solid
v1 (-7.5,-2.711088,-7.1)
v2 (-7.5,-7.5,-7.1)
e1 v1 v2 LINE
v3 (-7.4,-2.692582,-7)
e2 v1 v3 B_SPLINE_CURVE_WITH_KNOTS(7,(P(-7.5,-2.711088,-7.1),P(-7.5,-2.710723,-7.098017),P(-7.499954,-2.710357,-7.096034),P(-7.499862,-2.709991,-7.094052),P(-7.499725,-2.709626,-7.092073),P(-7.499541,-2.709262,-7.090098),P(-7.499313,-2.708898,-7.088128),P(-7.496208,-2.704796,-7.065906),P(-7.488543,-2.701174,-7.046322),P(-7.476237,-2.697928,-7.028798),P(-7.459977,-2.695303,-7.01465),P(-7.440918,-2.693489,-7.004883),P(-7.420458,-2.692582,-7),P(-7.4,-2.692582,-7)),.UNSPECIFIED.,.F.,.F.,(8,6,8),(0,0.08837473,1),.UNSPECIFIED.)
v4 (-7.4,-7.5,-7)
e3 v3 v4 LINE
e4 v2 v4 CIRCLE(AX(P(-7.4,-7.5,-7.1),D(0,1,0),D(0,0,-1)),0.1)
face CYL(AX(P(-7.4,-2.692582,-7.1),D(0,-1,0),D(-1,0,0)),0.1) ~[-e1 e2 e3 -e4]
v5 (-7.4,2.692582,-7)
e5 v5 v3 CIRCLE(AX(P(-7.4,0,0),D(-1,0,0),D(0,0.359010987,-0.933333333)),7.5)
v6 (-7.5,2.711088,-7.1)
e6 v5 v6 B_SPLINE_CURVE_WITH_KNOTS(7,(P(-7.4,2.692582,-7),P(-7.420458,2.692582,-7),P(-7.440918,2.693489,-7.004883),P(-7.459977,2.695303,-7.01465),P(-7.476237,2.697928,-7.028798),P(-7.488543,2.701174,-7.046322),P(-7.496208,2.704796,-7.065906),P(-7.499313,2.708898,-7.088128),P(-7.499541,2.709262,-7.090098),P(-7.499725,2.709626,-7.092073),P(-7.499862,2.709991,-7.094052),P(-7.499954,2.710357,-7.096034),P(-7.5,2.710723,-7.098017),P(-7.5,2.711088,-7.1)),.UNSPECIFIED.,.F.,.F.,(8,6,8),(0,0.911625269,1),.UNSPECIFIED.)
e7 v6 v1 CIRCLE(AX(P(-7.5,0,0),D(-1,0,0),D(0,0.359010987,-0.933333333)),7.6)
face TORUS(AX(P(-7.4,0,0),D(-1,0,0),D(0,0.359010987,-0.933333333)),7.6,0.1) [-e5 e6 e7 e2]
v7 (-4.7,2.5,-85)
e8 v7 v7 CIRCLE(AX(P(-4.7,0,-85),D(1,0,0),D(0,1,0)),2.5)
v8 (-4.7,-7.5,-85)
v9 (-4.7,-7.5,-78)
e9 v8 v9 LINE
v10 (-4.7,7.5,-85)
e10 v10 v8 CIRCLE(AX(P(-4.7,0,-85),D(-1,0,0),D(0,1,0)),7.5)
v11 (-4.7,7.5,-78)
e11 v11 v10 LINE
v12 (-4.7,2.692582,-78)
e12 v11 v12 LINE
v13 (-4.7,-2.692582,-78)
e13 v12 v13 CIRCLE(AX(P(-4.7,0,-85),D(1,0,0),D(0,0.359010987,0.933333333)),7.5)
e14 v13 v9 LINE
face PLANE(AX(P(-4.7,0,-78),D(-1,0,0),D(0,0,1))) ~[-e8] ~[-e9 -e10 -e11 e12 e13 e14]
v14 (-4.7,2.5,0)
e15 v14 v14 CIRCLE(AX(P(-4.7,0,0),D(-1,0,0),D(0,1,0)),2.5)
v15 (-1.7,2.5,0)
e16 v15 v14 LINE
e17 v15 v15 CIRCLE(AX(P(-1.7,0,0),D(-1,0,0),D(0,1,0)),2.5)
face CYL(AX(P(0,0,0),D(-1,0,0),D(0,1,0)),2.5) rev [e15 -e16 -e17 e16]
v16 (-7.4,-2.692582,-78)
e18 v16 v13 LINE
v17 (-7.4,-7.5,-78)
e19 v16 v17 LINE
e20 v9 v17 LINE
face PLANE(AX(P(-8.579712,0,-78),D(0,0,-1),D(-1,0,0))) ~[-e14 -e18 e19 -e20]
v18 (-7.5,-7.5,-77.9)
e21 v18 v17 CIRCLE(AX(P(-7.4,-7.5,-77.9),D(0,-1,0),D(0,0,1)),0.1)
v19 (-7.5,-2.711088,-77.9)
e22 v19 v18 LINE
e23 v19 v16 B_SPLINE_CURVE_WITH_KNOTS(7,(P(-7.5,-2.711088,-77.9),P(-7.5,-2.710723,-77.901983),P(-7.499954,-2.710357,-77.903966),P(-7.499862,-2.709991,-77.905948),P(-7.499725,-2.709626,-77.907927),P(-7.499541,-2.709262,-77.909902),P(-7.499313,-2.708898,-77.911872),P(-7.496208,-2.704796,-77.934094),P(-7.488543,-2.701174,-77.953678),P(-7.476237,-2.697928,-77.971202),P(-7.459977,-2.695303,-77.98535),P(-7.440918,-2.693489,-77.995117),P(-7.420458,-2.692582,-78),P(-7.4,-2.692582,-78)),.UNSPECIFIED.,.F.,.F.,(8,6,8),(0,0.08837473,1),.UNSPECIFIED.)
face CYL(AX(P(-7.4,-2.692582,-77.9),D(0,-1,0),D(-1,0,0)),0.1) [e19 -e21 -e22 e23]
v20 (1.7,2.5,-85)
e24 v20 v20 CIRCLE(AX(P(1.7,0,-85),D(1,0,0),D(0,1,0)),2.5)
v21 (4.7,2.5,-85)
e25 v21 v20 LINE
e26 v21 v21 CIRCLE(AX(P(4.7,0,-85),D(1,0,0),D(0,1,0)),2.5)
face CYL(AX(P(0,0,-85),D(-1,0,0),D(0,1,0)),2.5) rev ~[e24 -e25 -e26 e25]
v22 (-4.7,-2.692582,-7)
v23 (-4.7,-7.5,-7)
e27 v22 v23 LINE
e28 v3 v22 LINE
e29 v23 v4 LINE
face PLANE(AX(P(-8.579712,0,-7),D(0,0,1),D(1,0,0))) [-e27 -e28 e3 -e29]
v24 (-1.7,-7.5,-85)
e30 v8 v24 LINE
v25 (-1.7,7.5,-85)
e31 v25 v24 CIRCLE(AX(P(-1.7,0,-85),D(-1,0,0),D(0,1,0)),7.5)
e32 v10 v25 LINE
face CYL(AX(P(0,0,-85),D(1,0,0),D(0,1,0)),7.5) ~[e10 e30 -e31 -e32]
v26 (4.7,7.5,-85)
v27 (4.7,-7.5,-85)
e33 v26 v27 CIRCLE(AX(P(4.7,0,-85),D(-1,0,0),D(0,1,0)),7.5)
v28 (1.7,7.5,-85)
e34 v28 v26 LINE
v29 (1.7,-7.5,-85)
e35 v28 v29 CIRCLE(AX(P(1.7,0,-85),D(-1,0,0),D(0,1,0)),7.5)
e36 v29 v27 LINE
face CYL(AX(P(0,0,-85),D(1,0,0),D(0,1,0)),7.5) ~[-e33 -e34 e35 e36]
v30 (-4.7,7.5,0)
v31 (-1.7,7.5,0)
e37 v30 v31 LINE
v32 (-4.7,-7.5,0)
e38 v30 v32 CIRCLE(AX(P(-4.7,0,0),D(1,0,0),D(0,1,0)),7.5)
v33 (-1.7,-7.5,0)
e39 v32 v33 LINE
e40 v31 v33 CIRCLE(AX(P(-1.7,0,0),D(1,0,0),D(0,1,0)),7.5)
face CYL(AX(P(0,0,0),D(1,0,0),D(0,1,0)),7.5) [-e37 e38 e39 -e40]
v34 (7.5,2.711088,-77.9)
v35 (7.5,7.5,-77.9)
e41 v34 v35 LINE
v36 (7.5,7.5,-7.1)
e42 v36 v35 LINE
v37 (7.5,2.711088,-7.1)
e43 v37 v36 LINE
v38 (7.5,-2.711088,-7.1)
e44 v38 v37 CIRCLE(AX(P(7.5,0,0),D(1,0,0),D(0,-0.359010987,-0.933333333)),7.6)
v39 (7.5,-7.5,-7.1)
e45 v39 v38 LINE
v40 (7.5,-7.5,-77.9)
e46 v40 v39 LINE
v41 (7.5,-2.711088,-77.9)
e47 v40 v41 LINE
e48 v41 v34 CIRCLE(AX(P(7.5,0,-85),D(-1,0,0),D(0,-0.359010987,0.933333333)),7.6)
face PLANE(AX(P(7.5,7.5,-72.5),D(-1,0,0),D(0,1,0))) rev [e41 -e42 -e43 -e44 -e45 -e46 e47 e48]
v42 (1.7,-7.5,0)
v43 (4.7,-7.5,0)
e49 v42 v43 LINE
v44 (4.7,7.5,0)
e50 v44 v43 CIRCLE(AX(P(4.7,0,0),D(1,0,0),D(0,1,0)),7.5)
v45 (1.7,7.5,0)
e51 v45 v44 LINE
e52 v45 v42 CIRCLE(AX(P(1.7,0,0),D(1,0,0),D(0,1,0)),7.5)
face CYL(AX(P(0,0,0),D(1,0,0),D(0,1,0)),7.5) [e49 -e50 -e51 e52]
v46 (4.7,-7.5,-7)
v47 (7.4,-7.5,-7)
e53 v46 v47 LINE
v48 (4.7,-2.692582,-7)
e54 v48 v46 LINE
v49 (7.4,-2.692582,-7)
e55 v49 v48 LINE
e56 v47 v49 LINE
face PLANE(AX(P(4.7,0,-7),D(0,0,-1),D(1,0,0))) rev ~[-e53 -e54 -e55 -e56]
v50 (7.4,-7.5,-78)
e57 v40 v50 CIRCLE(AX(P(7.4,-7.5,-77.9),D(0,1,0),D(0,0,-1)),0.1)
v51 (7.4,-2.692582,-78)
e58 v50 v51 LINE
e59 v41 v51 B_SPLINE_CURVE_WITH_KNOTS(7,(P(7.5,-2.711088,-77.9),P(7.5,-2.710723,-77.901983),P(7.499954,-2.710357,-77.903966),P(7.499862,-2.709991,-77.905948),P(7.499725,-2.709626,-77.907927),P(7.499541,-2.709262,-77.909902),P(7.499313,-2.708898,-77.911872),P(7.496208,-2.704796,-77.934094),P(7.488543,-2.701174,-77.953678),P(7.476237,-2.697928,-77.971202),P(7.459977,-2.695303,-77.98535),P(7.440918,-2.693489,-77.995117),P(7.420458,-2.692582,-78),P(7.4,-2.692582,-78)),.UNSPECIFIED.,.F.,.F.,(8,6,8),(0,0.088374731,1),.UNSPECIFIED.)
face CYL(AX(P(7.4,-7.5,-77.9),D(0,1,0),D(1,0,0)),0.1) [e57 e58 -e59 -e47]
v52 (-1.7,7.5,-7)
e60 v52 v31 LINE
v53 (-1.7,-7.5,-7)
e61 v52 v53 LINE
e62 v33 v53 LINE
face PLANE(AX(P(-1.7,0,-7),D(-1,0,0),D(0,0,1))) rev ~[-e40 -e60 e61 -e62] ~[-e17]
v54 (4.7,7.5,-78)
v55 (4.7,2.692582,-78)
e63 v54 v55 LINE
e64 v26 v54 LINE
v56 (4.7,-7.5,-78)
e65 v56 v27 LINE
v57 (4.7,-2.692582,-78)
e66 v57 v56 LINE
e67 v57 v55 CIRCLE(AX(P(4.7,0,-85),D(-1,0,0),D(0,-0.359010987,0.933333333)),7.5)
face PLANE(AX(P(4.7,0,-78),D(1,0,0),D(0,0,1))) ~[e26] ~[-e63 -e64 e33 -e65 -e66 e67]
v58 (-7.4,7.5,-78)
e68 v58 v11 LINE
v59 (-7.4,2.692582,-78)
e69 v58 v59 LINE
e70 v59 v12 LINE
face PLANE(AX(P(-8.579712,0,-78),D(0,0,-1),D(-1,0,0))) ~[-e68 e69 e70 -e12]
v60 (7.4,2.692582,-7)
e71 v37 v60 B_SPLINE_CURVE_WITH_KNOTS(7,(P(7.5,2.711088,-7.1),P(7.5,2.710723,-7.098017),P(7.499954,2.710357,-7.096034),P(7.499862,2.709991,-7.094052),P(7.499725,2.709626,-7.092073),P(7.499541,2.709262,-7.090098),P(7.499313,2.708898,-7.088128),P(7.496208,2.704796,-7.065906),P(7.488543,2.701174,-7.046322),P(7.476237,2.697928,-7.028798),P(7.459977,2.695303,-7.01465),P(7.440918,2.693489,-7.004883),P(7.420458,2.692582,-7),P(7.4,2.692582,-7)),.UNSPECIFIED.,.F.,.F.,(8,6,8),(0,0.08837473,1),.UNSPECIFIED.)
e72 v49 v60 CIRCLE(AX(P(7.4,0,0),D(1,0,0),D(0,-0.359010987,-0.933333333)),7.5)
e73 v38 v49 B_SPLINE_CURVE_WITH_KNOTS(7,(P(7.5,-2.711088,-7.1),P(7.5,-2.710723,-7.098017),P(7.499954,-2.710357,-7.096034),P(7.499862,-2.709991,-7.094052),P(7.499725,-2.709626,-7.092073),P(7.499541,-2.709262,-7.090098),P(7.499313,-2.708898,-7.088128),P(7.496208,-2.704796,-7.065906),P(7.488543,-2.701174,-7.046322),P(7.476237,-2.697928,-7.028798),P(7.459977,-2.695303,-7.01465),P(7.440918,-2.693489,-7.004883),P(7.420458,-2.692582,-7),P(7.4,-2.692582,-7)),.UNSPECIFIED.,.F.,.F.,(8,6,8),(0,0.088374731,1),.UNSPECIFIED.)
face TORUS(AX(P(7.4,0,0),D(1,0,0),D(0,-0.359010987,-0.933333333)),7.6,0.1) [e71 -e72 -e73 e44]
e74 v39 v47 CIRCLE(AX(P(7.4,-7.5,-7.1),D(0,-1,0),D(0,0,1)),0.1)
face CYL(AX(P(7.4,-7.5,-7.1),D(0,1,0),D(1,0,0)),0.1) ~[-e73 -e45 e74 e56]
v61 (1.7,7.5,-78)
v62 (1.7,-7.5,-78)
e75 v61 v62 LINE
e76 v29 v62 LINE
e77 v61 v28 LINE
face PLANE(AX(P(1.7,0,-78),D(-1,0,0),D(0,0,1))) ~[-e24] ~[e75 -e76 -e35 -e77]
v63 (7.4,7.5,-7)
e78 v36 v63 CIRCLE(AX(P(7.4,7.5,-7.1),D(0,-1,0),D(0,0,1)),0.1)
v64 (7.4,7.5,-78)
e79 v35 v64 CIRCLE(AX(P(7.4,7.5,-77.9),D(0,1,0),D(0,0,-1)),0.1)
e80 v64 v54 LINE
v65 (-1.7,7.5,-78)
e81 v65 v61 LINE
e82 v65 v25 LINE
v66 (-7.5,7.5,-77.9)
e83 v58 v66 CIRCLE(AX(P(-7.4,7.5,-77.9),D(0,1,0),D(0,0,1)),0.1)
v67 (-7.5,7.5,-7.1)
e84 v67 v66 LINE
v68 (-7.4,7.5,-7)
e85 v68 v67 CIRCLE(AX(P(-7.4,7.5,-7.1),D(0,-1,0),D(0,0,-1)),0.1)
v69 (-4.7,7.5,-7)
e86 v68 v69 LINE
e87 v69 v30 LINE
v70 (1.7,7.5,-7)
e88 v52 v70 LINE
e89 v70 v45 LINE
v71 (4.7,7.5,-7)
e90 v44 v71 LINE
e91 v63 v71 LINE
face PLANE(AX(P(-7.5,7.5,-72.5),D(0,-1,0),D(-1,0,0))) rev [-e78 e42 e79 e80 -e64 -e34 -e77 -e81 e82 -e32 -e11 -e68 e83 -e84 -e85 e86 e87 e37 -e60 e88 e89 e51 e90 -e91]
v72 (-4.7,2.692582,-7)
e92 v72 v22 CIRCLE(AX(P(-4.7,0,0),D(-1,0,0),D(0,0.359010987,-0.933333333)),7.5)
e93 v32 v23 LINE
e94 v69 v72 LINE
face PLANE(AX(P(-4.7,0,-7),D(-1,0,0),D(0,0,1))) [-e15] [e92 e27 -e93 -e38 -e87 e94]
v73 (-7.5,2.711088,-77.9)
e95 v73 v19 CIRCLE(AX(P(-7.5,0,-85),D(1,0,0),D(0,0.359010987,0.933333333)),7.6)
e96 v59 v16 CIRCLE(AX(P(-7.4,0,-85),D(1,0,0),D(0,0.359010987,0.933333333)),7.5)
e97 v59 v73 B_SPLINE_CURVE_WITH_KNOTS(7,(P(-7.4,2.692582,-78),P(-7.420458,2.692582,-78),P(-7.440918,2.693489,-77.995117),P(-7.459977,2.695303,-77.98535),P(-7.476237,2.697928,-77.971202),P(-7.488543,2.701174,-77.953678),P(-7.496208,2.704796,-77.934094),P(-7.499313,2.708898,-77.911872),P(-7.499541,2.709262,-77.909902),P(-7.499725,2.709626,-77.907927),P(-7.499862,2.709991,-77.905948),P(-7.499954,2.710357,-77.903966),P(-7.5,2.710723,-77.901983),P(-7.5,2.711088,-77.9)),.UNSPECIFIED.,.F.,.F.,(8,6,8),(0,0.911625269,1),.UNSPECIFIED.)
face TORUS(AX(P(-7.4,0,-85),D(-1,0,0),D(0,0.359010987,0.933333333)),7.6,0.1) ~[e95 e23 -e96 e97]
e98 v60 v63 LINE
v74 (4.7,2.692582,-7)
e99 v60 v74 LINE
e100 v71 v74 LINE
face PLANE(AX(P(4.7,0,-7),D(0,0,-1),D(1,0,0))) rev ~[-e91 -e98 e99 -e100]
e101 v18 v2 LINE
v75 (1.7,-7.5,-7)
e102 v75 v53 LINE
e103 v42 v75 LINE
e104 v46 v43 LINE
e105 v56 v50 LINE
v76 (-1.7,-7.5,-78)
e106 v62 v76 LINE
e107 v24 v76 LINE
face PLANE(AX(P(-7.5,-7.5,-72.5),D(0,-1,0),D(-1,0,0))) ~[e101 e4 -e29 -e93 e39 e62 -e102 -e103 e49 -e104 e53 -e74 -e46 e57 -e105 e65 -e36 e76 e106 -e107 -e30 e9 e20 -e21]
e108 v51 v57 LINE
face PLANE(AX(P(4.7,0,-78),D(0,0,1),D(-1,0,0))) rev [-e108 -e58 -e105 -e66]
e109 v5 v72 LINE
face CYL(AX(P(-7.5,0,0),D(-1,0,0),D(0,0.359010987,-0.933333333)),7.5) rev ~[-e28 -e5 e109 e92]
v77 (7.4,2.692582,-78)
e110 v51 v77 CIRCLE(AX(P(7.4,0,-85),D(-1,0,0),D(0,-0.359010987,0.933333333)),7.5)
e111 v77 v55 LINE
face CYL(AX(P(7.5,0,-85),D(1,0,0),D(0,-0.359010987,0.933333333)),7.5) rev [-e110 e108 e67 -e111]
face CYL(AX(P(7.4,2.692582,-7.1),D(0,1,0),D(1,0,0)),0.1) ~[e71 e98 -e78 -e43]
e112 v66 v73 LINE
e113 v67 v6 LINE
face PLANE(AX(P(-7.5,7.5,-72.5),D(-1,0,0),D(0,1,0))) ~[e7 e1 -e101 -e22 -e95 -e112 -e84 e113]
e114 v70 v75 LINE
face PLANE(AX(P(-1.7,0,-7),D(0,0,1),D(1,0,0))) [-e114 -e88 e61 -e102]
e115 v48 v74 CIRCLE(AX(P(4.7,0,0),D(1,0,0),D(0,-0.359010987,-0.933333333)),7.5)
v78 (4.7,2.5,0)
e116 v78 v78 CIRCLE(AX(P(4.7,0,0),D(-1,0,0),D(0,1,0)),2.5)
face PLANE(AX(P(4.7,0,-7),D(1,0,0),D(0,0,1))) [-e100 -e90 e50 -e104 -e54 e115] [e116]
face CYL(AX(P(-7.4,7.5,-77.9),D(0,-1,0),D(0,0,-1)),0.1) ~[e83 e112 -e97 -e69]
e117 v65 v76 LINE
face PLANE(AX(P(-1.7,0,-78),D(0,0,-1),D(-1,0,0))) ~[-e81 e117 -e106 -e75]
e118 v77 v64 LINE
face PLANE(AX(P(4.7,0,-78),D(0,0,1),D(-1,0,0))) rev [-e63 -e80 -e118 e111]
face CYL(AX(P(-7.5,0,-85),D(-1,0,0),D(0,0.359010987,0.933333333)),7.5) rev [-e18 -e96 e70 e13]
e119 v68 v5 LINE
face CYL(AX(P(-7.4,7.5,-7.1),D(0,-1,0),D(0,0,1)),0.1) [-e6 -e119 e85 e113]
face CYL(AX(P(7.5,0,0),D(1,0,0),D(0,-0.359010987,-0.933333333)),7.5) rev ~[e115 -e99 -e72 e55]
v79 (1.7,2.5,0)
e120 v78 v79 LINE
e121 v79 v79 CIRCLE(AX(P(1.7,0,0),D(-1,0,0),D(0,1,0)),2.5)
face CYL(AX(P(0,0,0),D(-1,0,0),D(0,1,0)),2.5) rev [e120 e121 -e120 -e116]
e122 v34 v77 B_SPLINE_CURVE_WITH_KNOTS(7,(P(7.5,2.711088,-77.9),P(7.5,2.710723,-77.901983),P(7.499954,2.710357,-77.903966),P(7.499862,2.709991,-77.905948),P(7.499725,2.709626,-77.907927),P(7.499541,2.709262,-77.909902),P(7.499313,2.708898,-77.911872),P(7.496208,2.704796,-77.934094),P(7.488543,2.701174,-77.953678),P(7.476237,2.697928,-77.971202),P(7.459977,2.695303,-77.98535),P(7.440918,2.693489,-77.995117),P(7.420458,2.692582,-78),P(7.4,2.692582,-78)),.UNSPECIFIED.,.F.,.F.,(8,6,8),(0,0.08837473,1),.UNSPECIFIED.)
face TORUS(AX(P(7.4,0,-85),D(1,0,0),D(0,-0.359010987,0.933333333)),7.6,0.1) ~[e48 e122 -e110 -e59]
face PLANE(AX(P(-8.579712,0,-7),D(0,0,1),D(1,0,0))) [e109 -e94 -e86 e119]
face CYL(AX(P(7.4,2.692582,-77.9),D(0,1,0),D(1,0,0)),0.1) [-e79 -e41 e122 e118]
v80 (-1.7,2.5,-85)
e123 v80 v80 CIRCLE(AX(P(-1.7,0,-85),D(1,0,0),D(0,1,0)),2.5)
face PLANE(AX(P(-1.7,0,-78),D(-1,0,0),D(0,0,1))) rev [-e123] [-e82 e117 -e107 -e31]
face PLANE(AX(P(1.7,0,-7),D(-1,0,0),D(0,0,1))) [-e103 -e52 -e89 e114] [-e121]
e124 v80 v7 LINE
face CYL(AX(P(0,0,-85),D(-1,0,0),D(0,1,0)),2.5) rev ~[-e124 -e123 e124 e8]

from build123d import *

# Parameters (mm, degrees)
F1_R         = 2.5
F2_DEPTH     = 7.5
F3_W         = 3.4
F3_H         = 15.4505071864
F3_W_2       = 3.8797123611
F3_W_3       = 3.8316924378
F4_DEPTH     = 16.41578
F6_DEPTH     = 2.8
F8_DEPTH     = 2.8
F9_R         = 0.1
F10_R        = 2.5
F11_DEPTH    = 7.5
F12_W        = 3
F12_H        = 7.5577301905
F13_DEPTH    = 15.0010001
F14_T1_DEPTH = 16.5892781094
F16_W        = 15
F16_H        = 15
F17_DEPTH    = 30


# Not quite as in the source:
# - a fillet or chamfer that OpenCascade refuses, or shapes differently, is made with other operations: its cross-section is extruded or revolved along the edge and cut away or added


with BuildPart() as f2:
    # F1 (on Right) → F2 (new body, symmetric)
    with BuildSketch(Plane.YZ):
        with BuildLine():
            Line((7.5, -12.5), (7.5, 0))
            ThreePointArc((7.5, 0), (0, 7.5), (-7.5, 0))
            Line((-7.5, 0), (-7.5, -12.5))
            Line((-7.5, -12.5), (7.5, -12.5))
        make_face()
        Circle(F1_R, mode=Mode.SUBTRACT)
    extrude(amount=F2_DEPTH, both=True)

    # F3 (on Front) → F4 (cut, symmetric)
    with BuildSketch(Plane.XZ):
        with Locations((0, 0.7252535932)):
            Rectangle(F3_W, F3_H)
        with Locations((-6.6398561805, 0.7252535932)):
            Rectangle(F3_W_2, F3_H)
        with Locations((6.6158462189, 0.7252535932)):
            Rectangle(F3_W_3, F3_H)
    extrude(amount=F4_DEPTH, both=True, mode=Mode.SUBTRACT)

    # F5 (on face) → F6 (cut, through all)
    with BuildSketch(Plane(origin=(-7.5, 0, 0), x_dir=(0, -1, 0), z_dir=(-1, 0, 0))):
        with BuildLine():
            ThreePointArc((2.6925824036, -7), (6.1824092402, -4.2459175671), (7.5, 0))
            ThreePointArc((7.5, 0), (-4.2459175671, 6.1824092402), (-2.6925824036, -7))
            Line((-2.6925824036, -7), (2.6925824036, -7))
        make_face()
        with BuildLine():
            Line((2.6925824036, -7), (-2.6925824036, -7))
            ThreePointArc((-2.6925824036, -7), (0, -7.5), (2.6925824036, -7))
        make_face()
    extrude(amount=-F6_DEPTH, mode=Mode.SUBTRACT)

    # F7 (on face) → F8 (cut, through all)
    with BuildSketch(Plane.YZ.offset(7.5)):
        with BuildLine():
            Line((2.6925824036, -7), (-2.6925824036, -7))
            ThreePointArc((-2.6925824036, -7), (0, -7.5), (2.6925824036, -7))
        make_face()
        with BuildLine():
            ThreePointArc((2.6925824036, -7), (6.1824092402, -4.2459175671), (7.5, 0))
            ThreePointArc((7.5, 0), (-4.2459175671, 6.1824092402), (-2.6925824036, -7))
            Line((-2.6925824036, -7), (2.6925824036, -7))
        make_face()
    extrude(amount=-F8_DEPTH, mode=Mode.SUBTRACT)

    # F9
    f9_edges = [f2.edges().sort_by_distance(p)[0] for p in [
        (7.5, -5.096291, -7),
        (7.5, 0, -7.5),
        (7.5, 5.096291, -7),
        (-7.5, 5.096291, -7),
        (-7.5, 0, -7.5),
        (-7.5, -5.096291, -7),
    ]]
    fillet(f9_edges, radius=F9_R)

    # F16 (on face) → F17 (join)
    with BuildSketch(Plane(origin=(0, 0, -12.5), x_dir=(1, 0, 0), z_dir=(0, 0, -1))):
        Rectangle(F16_W, F16_H)
    extrude(amount=F17_DEPTH)

    # F18: F2 across face


with BuildPart() as f11:
    # F10 (on Right) → F11 (new body, symmetric)
    with BuildSketch(Plane.YZ):
        with BuildLine():
            Line((-7.5, 15.0892781094), (-7.5, 0))
            ThreePointArc((-7.5, 0), (0, -7.5), (7.5, 0))
            Line((7.5, 0), (7.5, 15.0892781094))
            Line((7.5, 15.0892781094), (-7.5, 15.0892781094))
        make_face()
        Circle(F10_R, mode=Mode.SUBTRACT)
    extrude(amount=F11_DEPTH, both=True)

    # F12 (on face) → F13 (cut, through all)
    with BuildSketch(Plane.XZ.offset(7.5)):
        with Locations((-3.2, 3.7788650952)):
            Rectangle(F12_W, F12_H)
        with Locations((3.2, 3.7788650952)):
            Rectangle(F12_W, F12_H)
    extrude(amount=-F13_DEPTH, mode=Mode.SUBTRACT)

    # F14: fillet of radius 0.1 on 4 edges, made by hand

    # F14_s2 → F14_t1 (cut)
    with BuildSketch(Plane.XY.offset(-1.25)):
        with BuildLine():
            ThreePointArc((-7.4, 7.5), (-7.4707106781, 7.4707106781), (-7.5, 7.4))
            Line((-7.5, 7.4), (-7.5, 7.5))
            Line((-7.5, 7.5), (-7.4, 7.5))
        make_face()
        with BuildLine():
            ThreePointArc((-7.5, -7.4), (-7.4707106781, -7.4707106781), (-7.4, -7.5))
            Line((-7.4, -7.5), (-7.5, -7.5))
            Line((-7.5, -7.5), (-7.5, -7.4))
        make_face()
        with BuildLine():
            ThreePointArc((7.4, 7.5), (7.4707106781, 7.4707106781), (7.5, 7.4))
            Line((7.5, 7.4), (7.5, 7.5))
            Line((7.5, 7.5), (7.4, 7.5))
        make_face()
        with BuildLine():
            ThreePointArc((7.5, -7.4), (7.4707106781, -7.4707106781), (7.4, -7.5))
            Line((7.4, -7.5), (7.5, -7.5))
            Line((7.5, -7.5), (7.5, -7.4))
        make_face()
    extrude(amount=F14_T1_DEPTH, mode=Mode.SUBTRACT)


with BuildPart() as f2_1:
    add(f2.part)
    add(f2.part.mirror(Plane(origin=(0, 0, -42.5), x_dir=(1, 0, 0), z_dir=(0, 0, -1))))


solid = f2_1.part
